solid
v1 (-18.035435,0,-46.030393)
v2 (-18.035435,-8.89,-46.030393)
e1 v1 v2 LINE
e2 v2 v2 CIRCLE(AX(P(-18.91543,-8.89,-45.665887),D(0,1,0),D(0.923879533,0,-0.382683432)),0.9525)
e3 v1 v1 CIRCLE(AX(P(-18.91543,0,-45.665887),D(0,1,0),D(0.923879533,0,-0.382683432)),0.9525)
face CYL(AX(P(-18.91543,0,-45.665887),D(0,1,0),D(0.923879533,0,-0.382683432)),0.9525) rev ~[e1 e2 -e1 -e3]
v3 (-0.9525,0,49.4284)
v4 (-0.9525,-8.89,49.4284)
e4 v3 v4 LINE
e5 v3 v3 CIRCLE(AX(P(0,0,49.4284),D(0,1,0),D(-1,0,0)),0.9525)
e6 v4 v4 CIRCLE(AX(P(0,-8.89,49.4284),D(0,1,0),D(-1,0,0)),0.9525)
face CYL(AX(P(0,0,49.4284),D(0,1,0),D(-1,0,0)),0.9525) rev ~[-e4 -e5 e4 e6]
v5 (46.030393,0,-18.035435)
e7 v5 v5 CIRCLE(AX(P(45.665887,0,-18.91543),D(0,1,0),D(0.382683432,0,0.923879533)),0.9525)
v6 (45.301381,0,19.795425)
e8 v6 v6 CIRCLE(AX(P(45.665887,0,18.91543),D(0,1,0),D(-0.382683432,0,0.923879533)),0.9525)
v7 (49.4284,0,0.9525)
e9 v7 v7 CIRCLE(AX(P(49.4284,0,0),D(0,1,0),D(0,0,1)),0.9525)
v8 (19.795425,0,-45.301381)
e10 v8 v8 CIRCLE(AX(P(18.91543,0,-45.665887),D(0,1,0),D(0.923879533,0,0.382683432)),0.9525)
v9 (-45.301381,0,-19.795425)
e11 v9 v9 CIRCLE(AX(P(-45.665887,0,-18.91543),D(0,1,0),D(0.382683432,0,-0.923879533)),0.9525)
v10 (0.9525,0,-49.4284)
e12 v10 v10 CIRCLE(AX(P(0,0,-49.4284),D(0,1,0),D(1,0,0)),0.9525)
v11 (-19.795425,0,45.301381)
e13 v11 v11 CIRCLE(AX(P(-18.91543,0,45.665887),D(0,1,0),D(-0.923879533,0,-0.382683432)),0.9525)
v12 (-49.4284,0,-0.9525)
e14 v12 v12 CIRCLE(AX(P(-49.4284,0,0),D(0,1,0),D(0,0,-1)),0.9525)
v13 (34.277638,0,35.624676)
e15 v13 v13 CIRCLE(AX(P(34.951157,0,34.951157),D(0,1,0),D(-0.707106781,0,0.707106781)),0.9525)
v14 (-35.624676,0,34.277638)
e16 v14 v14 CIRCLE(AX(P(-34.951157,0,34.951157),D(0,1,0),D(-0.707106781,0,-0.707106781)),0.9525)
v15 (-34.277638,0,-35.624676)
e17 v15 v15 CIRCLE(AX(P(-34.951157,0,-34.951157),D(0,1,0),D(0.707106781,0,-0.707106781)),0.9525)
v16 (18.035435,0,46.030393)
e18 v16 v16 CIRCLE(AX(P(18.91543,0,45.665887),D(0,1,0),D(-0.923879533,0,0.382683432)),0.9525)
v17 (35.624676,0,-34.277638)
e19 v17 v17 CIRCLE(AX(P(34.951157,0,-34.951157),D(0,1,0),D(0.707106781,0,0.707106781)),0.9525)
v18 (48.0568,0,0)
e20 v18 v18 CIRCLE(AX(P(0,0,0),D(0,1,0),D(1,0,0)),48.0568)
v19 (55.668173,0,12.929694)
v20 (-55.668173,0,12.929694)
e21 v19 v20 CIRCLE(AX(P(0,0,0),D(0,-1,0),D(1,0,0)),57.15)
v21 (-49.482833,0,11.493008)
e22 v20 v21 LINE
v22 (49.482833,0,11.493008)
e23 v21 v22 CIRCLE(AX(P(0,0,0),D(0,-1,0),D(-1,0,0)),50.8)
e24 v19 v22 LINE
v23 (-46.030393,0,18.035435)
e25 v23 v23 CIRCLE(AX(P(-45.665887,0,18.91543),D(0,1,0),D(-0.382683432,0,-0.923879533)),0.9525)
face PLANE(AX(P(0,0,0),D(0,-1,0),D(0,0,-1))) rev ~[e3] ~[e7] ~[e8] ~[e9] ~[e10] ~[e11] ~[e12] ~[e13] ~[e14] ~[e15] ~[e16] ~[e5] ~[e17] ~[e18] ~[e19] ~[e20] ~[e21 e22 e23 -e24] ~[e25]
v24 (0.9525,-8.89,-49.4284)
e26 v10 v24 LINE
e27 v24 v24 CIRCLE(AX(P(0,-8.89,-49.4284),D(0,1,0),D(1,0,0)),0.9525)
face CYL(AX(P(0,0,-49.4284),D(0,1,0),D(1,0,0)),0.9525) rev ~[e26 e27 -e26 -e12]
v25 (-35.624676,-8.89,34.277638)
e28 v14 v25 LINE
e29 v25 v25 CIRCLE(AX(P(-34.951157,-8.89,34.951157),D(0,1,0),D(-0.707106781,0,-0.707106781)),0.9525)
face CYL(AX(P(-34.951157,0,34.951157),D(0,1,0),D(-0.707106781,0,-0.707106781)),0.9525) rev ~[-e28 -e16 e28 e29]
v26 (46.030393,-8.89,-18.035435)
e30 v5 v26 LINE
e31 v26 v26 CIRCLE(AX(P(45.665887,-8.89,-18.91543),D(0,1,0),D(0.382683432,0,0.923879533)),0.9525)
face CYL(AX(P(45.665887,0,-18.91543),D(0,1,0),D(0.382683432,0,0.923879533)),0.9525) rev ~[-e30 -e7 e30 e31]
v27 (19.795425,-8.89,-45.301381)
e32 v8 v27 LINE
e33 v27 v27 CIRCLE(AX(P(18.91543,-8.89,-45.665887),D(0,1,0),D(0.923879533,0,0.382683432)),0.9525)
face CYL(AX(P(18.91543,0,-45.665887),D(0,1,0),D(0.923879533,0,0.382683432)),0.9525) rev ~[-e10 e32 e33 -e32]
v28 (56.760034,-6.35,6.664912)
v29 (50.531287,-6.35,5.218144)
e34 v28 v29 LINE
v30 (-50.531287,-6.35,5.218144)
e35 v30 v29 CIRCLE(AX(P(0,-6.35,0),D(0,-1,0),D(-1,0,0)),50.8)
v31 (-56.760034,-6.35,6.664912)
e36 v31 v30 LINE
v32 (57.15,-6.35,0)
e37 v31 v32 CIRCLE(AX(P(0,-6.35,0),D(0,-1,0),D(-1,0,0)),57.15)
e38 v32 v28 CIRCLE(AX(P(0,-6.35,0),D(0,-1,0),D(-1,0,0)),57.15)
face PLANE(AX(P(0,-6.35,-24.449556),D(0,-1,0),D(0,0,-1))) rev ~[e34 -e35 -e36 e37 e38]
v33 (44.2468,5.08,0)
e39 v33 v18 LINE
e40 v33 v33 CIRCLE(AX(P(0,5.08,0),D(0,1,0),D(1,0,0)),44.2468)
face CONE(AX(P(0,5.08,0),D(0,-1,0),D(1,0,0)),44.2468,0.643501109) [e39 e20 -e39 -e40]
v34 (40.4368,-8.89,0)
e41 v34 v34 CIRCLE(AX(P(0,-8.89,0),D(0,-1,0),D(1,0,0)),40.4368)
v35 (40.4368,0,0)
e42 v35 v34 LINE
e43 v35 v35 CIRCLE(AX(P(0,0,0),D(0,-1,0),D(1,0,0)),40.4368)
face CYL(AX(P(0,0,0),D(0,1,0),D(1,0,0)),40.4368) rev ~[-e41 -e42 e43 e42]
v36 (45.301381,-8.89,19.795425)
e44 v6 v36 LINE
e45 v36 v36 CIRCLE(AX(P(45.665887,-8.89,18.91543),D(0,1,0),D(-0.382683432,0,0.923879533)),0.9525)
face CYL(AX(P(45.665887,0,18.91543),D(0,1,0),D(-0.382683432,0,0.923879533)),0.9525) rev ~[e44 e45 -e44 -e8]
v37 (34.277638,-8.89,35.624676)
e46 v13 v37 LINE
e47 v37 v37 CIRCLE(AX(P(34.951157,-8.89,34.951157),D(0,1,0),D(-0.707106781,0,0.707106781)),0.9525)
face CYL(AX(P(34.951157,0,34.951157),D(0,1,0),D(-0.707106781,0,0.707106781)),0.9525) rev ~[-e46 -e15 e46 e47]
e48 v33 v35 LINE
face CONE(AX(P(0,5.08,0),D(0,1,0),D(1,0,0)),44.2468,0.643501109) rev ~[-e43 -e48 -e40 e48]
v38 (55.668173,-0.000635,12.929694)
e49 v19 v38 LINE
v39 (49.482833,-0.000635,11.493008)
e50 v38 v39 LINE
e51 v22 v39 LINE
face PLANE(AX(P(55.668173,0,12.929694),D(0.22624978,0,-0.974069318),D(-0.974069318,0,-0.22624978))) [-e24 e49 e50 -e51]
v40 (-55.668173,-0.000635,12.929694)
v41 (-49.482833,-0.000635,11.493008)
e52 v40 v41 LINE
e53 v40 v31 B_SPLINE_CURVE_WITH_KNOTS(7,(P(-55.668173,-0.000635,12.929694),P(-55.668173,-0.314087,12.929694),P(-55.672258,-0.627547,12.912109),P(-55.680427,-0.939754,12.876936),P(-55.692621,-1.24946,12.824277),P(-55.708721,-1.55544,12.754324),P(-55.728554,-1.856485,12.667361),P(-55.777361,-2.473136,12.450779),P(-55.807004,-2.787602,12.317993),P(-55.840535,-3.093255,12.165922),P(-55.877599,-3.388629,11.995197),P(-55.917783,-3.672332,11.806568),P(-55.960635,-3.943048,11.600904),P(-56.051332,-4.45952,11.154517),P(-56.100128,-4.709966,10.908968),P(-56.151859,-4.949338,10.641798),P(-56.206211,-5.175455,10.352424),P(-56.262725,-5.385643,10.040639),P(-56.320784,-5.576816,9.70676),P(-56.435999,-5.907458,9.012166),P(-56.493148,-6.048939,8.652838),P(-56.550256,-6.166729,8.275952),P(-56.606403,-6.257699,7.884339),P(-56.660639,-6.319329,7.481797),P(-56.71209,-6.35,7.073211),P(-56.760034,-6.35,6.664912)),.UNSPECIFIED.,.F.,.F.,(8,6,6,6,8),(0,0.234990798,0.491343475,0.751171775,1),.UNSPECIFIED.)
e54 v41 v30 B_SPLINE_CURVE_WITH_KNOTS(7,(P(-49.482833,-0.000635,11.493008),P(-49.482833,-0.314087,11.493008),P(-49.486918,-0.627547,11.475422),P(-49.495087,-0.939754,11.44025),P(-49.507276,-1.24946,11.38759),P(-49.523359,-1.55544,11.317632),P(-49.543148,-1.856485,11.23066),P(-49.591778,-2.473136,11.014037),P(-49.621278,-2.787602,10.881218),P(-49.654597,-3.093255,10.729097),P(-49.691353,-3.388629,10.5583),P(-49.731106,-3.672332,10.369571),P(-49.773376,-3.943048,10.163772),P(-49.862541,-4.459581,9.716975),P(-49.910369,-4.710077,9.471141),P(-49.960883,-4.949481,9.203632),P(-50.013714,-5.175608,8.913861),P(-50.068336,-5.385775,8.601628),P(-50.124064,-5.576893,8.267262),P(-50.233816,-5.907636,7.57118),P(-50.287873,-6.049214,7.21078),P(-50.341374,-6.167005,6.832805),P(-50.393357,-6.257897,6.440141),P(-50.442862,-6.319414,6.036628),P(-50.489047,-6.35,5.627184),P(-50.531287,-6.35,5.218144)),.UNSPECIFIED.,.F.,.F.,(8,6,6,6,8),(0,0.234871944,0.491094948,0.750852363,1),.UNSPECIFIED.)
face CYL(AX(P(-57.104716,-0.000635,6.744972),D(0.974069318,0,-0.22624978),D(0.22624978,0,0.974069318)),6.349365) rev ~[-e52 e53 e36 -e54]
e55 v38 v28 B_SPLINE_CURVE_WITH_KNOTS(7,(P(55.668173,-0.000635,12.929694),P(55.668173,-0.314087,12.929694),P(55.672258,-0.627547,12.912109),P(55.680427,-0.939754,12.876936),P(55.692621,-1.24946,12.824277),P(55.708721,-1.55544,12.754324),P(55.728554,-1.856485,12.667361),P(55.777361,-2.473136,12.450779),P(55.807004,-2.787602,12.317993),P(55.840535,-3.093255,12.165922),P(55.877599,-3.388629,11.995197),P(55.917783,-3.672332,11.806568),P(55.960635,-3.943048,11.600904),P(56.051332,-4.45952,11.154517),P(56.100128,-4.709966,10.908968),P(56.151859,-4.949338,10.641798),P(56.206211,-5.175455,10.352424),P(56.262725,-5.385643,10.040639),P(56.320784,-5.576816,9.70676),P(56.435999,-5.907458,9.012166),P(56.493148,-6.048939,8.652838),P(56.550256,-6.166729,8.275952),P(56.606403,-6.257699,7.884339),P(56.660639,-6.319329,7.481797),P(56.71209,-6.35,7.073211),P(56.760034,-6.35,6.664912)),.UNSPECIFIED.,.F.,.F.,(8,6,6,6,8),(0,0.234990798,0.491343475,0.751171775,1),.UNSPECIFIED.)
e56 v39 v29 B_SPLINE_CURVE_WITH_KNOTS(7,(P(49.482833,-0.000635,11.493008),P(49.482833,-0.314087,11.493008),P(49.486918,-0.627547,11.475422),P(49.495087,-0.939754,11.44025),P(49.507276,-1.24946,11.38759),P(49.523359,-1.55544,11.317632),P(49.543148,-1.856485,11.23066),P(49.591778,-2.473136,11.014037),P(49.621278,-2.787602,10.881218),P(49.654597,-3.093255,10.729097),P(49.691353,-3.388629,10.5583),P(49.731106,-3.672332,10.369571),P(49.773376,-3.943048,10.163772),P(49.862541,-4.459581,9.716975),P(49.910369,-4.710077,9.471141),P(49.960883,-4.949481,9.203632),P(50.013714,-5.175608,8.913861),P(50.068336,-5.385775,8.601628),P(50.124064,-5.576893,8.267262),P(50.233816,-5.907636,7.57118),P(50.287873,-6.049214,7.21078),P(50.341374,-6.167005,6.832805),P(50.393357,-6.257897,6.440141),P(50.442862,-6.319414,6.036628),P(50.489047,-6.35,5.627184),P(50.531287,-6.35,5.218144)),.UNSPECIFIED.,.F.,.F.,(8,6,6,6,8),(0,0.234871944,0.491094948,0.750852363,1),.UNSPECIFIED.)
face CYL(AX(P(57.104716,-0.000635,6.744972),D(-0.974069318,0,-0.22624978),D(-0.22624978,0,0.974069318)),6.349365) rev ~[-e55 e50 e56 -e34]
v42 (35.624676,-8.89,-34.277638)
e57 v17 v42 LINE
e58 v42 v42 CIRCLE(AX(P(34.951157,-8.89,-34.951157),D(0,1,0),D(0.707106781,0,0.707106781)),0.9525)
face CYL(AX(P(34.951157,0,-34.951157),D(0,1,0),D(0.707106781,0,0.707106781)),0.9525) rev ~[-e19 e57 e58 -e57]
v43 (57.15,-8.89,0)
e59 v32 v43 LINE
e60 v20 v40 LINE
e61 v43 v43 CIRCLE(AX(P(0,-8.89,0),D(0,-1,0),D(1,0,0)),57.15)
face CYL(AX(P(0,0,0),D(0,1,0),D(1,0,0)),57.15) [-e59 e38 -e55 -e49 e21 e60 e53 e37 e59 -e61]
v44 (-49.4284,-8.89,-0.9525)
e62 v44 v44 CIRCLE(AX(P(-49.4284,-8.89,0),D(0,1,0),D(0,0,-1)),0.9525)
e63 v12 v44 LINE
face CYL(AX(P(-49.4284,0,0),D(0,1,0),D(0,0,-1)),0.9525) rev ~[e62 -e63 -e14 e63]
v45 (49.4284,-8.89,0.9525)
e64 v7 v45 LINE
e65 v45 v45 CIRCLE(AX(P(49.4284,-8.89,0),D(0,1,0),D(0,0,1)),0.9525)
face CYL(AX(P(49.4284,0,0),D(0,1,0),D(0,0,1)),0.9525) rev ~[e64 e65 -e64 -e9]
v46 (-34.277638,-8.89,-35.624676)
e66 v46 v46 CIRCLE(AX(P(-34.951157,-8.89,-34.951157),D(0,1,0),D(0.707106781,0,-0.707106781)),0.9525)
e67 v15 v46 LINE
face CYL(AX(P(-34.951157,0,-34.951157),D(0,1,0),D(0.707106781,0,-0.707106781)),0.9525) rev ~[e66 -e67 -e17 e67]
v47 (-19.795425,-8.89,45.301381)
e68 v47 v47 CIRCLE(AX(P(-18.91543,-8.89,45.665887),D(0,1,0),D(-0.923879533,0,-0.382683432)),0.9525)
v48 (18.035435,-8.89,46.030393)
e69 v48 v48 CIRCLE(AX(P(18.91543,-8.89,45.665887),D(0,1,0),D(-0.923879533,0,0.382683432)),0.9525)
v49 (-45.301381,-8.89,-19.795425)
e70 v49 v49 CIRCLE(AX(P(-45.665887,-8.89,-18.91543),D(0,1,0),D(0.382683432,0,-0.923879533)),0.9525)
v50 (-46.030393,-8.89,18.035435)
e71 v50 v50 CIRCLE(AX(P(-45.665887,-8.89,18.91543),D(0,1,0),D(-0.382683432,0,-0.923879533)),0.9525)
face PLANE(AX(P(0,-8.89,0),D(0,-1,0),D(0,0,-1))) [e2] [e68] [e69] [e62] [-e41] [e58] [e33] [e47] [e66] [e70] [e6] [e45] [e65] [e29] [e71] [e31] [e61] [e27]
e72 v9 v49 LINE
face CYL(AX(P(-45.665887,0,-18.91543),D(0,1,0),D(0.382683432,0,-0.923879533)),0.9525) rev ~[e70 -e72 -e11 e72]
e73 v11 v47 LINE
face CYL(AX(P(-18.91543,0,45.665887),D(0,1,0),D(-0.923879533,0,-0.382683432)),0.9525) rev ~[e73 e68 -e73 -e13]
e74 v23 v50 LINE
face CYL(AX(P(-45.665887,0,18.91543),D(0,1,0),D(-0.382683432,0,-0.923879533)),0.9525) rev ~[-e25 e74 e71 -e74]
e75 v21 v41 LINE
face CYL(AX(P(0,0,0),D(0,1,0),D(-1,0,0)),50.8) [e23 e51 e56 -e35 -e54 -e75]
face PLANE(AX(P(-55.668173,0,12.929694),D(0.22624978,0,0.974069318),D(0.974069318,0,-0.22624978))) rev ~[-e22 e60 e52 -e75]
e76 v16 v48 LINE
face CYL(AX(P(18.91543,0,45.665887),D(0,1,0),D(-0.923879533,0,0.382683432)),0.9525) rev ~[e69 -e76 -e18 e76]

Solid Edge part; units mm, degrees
sketch "Sketch1" plane through (0, 0, 0) normal (0, -1, 0) x (1, 0, 0)
  circle A0 centre (0, 0) radius 40.4368
  circle A1 centre (0, 0) radius 50.8
  dimension "D1" = 101.6
  dimension "D2" = 114.3
  dimension "D3" = 80.8736
extrude "Protrusion1" add sketch "Sketch1" along normal blind 8.89
sketch "Sketch2" plane through (0, 0, 0) normal (0, 0, 1) x (1, 0, 0)
  line L0 (44.2468, 5.08) -> (40.4368, 0)
  line L1 (40.4368, 0) -> (48.0568, 0)
  line L2 (44.2468, 5.08) -> (48.0568, 0)
revolve "RevolvedProtrusion1" add sketch "Sketch2" angle 360 about axis through (0, 0, 0) along (0, 1, 0)
sketch "Sketch3" plane through (0, 0, 0) normal (0, 1, 0) x (-1, 0, 0)
  circle A0 centre (0, 49.4284) radius 0.9525
extrude "Cutout1" cut sketch "Sketch3" against normal through all
pattern_circular "Pattern_2" count 16 over 360 about axis through (0, 0, 0) along (0, 1, 0) of "Cutout1"
sketch "Sketch4" plane through (0, 0, 0) normal (0, -1, 0) x (1, 0, 0)
  circle A0 centre (0, 0) radius 57.15
  circle A1 centre (0, 0) radius 50.8
  dimension "D1" = 101.6
  dimension "D2" = 114.3
  dimension "D3" = 80.8736
extrude "Protrusion2" add sketch "Sketch4" along normal up to vertex (8.89 mm away)
sketch "Sketch5" plane through (0, 0, 0) normal (0, 1, 0) x (-1, 0, 0)
  line L0 (-55.6682, 12.9297) -> (-49.4828, 11.493)
  line L1 (55.6682, 12.9297) -> (49.4828, 11.493)
  arc A0 (49.4828, 11.493) -> (-49.4828, 11.493) centre (0, 0) cw
  arc A1 (55.6682, 12.9297) -> (-55.6682, 12.9297) centre (0, 0) cw
extrude "Cutout17" cut sketch "Sketch5" against normal blind 6.35
fillet "Round_2" radius 6.35 2 edges at (52.5755, -6.35, 12.2114) (-52.5755, -6.35, 12.2114)
